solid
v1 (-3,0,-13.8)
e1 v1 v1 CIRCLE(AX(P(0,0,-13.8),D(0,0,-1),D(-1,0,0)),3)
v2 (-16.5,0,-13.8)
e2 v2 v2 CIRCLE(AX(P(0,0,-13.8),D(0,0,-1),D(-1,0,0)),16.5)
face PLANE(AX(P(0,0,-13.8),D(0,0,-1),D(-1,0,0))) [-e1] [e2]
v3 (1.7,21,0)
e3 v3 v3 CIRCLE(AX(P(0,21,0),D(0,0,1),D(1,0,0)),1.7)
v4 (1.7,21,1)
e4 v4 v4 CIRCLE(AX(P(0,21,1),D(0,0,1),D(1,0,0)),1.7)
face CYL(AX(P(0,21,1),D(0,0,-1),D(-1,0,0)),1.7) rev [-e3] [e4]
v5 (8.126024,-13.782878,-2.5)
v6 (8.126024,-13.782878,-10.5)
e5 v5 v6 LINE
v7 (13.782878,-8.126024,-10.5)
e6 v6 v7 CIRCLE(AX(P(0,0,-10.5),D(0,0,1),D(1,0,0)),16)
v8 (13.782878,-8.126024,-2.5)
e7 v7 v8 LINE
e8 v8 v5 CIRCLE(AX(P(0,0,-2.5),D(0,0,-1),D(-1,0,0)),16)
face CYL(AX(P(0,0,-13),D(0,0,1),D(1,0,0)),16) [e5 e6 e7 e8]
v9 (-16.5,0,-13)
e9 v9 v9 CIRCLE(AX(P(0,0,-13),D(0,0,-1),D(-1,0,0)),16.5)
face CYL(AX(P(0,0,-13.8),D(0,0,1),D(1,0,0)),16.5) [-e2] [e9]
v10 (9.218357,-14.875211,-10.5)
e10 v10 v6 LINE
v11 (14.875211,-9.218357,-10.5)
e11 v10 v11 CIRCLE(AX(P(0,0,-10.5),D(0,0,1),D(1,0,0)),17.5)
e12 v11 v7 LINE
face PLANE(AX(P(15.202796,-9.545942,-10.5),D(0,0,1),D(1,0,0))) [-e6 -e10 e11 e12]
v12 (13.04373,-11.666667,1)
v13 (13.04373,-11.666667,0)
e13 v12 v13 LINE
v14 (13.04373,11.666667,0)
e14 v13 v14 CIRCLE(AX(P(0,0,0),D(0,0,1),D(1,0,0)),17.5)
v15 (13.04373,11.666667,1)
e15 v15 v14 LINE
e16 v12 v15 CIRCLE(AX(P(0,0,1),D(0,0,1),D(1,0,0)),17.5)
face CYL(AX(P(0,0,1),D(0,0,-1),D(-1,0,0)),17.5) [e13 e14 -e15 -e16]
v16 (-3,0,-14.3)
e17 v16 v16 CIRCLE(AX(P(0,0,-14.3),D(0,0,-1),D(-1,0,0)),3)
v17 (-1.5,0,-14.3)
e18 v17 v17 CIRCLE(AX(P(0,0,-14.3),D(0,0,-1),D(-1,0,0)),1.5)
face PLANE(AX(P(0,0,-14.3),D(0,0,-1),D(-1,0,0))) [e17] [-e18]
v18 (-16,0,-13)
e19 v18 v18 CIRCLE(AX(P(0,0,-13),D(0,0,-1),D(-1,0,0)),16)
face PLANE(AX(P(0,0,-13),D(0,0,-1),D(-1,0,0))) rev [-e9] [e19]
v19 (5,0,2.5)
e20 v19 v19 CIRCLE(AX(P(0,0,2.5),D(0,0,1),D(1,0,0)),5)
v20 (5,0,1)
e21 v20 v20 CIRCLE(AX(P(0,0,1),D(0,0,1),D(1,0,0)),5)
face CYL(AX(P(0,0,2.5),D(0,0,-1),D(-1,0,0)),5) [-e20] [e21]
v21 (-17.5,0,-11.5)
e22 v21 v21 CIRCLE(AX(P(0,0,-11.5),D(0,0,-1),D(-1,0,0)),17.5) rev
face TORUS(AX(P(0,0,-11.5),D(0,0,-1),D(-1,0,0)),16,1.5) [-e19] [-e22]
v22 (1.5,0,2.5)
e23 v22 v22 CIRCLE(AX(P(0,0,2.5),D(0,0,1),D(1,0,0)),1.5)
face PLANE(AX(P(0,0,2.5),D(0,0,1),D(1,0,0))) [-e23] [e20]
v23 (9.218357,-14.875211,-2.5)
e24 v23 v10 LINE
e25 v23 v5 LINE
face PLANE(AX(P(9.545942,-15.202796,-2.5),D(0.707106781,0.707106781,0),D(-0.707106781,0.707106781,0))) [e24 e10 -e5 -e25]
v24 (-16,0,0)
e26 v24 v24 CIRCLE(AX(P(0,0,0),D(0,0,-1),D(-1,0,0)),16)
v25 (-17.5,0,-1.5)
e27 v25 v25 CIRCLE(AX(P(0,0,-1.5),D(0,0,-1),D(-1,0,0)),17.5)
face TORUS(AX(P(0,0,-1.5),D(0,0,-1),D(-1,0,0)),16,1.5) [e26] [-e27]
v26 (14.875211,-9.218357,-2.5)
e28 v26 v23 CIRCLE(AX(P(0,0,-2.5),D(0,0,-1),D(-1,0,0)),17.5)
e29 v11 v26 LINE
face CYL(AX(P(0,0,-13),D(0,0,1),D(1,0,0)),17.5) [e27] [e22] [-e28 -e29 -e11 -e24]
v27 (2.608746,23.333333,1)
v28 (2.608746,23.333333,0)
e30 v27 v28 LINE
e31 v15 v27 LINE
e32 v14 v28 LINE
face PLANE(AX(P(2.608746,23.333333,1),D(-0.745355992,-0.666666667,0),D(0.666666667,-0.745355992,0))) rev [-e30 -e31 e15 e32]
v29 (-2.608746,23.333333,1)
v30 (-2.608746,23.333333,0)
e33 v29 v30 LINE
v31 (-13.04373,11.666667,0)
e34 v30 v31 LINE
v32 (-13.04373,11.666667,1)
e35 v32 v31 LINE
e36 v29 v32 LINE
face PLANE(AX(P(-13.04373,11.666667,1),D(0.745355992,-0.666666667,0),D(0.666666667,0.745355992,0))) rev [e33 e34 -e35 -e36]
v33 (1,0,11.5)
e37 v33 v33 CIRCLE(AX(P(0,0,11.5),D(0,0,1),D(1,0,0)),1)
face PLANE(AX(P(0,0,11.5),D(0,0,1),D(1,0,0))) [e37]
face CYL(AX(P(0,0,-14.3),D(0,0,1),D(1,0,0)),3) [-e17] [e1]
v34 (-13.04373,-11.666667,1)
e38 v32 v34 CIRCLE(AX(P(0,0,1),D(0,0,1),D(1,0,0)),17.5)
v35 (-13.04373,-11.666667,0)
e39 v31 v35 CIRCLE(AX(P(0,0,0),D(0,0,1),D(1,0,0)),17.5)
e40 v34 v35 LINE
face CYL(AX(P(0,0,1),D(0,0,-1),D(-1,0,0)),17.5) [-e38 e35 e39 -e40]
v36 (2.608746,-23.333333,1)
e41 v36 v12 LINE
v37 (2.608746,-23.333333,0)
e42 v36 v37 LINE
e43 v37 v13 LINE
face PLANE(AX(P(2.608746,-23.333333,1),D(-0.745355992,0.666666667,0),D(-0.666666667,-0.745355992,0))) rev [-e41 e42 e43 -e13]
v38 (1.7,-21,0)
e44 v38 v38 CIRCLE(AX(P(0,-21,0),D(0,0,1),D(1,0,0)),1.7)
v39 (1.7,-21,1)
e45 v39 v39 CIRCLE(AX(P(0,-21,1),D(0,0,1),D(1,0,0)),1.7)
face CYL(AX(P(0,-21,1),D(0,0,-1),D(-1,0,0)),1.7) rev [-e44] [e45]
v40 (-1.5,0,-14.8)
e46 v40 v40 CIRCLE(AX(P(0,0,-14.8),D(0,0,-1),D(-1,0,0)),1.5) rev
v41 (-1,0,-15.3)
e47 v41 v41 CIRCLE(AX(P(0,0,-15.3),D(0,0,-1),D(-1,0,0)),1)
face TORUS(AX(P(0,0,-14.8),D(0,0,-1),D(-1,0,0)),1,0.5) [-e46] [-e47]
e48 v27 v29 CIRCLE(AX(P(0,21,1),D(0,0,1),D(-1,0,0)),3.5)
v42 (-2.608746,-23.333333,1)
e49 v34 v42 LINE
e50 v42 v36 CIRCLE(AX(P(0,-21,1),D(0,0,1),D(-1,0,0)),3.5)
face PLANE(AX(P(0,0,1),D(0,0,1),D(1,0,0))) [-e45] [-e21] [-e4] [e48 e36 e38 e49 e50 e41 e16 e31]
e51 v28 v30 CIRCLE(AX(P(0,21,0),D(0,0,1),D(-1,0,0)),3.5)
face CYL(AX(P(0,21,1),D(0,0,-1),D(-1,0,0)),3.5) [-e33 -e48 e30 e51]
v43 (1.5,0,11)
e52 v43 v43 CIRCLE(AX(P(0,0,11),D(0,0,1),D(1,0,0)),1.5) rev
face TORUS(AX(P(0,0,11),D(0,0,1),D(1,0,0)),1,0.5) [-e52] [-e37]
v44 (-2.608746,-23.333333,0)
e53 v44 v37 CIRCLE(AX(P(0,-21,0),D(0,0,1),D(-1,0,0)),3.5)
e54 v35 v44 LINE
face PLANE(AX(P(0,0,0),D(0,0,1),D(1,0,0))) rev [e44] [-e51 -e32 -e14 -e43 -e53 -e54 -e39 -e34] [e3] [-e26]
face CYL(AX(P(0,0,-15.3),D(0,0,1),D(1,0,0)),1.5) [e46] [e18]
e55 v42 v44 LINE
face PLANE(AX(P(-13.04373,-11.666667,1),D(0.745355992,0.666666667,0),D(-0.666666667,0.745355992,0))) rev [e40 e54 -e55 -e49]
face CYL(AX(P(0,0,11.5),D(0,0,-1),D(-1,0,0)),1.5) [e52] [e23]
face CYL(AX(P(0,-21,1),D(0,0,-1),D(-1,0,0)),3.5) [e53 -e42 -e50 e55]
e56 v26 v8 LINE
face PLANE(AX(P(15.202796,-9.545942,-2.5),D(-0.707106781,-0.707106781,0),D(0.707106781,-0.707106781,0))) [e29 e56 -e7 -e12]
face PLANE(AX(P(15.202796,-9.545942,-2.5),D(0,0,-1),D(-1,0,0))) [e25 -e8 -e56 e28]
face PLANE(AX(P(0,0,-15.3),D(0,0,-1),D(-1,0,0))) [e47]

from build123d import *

# Parameters (mm, degrees)
SKETCH1_R           = 1.7
BOSS_EXTRUDE1_DEPTH = 1
SKETCH2_R           = 17.5
BOSS_EXTRUDE2_DEPTH = 13
FILLET4_R           = 1.5
SKETCH3_R           = 16.5
BOSS_EXTRUDE3_DEPTH = 0.8
SKETCH4_R           = 5
BOSS_EXTRUDE4_DEPTH = 1.5
SKETCH6_R           = 1.5
BOSS_EXTRUDE5_DEPTH = 9
FILLET2_R           = 0.5
SKETCH8_R           = 3
BOSS_EXTRUDE6_DEPTH = 0.5
BOSS_EXTRUDE7_START = 1
SKETCH9_R           = 1.5
BOSS_EXTRUDE7_DEPTH = 1
FILLET3_R           = 0.5
SURFACECUT1_START   = -10.5
SURFACECUT1_DEPTH   = 8


# Read off the part's stored shape, not the designer's step: SurfaceCut1
with BuildPart() as part:
    # Sketch1 → Boss-Extrude1 (new body)
    with BuildSketch(Plane.XY):
        with BuildLine():
            Line((-13.043729869, 11.666666667), (-2.608745974, 23.333333333))
            ThreePointArc((-2.608745974, 23.333333333), (0, 24.5), (2.608745974, 23.333333333))
            Line((2.608745974, 23.333333333), (13.043729869, 11.666666667))
            ThreePointArc((13.043729869, 11.666666667), (17.5, 0), (13.043729869, -11.666666667))
            Line((13.043729869, -11.666666667), (2.608745974, -23.333333333))
            ThreePointArc((2.608745974, -23.333333333), (0, -24.5), (-2.608745974, -23.333333333))
            Line((-2.608745974, -23.333333333), (-13.043729869, -11.666666667))
            ThreePointArc((-13.043729869, -11.666666667), (-17.5, 0), (-13.043729869, 11.666666667))
        make_face()
        with Locations((0, 21)):
            Circle(SKETCH1_R, mode=Mode.SUBTRACT)
        with Locations((0, -21)):
            Circle(SKETCH1_R, mode=Mode.SUBTRACT)
    extrude(amount=BOSS_EXTRUDE1_DEPTH)


with BuildPart() as body_2:
    # Sketch2 → Boss-Extrude2 (new body)
    with BuildSketch(Plane(origin=(0, 0, 0), x_dir=(-1, 0, 0), z_dir=(0, 0, -1))):
        with Locations(Location((0, 0, 0), (0, 0, 180))):
            Circle(SKETCH2_R)
    extrude(amount=BOSS_EXTRUDE2_DEPTH)

    # Fillet4
    fillet4_edges = [body_2.edges().sort_by_distance(p)[0] for p in [
        (-17.5, 0, 0),
        (-17.5, 0, -13),
    ]]
    fillet(fillet4_edges, radius=FILLET4_R)


with BuildPart() as part_1:
    add(part.part)

    # Combine1: union body 2
    add(body_2.part)

    # Sketch3 → Boss-Extrude3 (add)
    with BuildSketch(Plane(origin=(0, 0, -13), x_dir=(-1, 0, 0), z_dir=(0, 0, -1))):
        Circle(SKETCH3_R)
    extrude(amount=BOSS_EXTRUDE3_DEPTH)

    # Sketch4 → Boss-Extrude4 (add)
    with BuildSketch(Plane.XY.offset(1)):
        Circle(SKETCH4_R)
    extrude(amount=BOSS_EXTRUDE4_DEPTH)

    # Sketch6 → Boss-Extrude5 (add)
    with BuildSketch(Plane.XY.offset(2.5)):
        Circle(SKETCH6_R)
    extrude(amount=BOSS_EXTRUDE5_DEPTH)

    # Fillet2
    fillet2_edges = [part_1.edges().sort_by_distance(p)[0] for p in [
        (-1.5, 0, 11.5),
    ]]
    fillet(fillet2_edges, radius=FILLET2_R)

    # Sketch8 → Boss-Extrude6 (add)
    with BuildSketch(Plane(origin=(0, 0, -13.8), x_dir=(-1, 0, 0), z_dir=(0, 0, -1))):
        Circle(SKETCH8_R)
    extrude(amount=BOSS_EXTRUDE6_DEPTH)

    # Sketch9 → Boss-Extrude7 (add)
    with BuildSketch(Plane(origin=(0, 0, -14.3), x_dir=(-1, 0, 0), z_dir=(0, 0, -1)).offset(BOSS_EXTRUDE7_START)):
        with Locations(Location((0, 0, 0), (0, 0, 180))):
            Circle(SKETCH9_R)
    extrude(amount=-BOSS_EXTRUDE7_DEPTH)

    # Fillet3
    fillet3_edges = [part_1.edges().sort_by_distance(p)[0] for p in [
        (-1.5, 0, -15.3),
    ]]
    fillet(fillet3_edges, radius=FILLET3_R)

    # SurfaceCut1 outline → SurfaceCut1 (cut)
    with BuildSketch(Plane.XY.offset(SURFACECUT1_START)):
        with BuildLine():
            Line((8.126024025, -13.782878275), (9.218356678, -14.875210928))
            ThreePointArc((9.218356678, -14.875210928), (12.374368671, -12.374368671), (14.875210928, -9.218356678))
            Line((14.875210928, -9.218356678), (13.782878275, -8.126024025))
            ThreePointArc((13.782878275, -8.126024025), (11.313708499, -11.313708499), (8.126024025, -13.782878275))
        make_face()
    extrude(amount=SURFACECUT1_DEPTH, mode=Mode.SUBTRACT)


solid = part_1.part
